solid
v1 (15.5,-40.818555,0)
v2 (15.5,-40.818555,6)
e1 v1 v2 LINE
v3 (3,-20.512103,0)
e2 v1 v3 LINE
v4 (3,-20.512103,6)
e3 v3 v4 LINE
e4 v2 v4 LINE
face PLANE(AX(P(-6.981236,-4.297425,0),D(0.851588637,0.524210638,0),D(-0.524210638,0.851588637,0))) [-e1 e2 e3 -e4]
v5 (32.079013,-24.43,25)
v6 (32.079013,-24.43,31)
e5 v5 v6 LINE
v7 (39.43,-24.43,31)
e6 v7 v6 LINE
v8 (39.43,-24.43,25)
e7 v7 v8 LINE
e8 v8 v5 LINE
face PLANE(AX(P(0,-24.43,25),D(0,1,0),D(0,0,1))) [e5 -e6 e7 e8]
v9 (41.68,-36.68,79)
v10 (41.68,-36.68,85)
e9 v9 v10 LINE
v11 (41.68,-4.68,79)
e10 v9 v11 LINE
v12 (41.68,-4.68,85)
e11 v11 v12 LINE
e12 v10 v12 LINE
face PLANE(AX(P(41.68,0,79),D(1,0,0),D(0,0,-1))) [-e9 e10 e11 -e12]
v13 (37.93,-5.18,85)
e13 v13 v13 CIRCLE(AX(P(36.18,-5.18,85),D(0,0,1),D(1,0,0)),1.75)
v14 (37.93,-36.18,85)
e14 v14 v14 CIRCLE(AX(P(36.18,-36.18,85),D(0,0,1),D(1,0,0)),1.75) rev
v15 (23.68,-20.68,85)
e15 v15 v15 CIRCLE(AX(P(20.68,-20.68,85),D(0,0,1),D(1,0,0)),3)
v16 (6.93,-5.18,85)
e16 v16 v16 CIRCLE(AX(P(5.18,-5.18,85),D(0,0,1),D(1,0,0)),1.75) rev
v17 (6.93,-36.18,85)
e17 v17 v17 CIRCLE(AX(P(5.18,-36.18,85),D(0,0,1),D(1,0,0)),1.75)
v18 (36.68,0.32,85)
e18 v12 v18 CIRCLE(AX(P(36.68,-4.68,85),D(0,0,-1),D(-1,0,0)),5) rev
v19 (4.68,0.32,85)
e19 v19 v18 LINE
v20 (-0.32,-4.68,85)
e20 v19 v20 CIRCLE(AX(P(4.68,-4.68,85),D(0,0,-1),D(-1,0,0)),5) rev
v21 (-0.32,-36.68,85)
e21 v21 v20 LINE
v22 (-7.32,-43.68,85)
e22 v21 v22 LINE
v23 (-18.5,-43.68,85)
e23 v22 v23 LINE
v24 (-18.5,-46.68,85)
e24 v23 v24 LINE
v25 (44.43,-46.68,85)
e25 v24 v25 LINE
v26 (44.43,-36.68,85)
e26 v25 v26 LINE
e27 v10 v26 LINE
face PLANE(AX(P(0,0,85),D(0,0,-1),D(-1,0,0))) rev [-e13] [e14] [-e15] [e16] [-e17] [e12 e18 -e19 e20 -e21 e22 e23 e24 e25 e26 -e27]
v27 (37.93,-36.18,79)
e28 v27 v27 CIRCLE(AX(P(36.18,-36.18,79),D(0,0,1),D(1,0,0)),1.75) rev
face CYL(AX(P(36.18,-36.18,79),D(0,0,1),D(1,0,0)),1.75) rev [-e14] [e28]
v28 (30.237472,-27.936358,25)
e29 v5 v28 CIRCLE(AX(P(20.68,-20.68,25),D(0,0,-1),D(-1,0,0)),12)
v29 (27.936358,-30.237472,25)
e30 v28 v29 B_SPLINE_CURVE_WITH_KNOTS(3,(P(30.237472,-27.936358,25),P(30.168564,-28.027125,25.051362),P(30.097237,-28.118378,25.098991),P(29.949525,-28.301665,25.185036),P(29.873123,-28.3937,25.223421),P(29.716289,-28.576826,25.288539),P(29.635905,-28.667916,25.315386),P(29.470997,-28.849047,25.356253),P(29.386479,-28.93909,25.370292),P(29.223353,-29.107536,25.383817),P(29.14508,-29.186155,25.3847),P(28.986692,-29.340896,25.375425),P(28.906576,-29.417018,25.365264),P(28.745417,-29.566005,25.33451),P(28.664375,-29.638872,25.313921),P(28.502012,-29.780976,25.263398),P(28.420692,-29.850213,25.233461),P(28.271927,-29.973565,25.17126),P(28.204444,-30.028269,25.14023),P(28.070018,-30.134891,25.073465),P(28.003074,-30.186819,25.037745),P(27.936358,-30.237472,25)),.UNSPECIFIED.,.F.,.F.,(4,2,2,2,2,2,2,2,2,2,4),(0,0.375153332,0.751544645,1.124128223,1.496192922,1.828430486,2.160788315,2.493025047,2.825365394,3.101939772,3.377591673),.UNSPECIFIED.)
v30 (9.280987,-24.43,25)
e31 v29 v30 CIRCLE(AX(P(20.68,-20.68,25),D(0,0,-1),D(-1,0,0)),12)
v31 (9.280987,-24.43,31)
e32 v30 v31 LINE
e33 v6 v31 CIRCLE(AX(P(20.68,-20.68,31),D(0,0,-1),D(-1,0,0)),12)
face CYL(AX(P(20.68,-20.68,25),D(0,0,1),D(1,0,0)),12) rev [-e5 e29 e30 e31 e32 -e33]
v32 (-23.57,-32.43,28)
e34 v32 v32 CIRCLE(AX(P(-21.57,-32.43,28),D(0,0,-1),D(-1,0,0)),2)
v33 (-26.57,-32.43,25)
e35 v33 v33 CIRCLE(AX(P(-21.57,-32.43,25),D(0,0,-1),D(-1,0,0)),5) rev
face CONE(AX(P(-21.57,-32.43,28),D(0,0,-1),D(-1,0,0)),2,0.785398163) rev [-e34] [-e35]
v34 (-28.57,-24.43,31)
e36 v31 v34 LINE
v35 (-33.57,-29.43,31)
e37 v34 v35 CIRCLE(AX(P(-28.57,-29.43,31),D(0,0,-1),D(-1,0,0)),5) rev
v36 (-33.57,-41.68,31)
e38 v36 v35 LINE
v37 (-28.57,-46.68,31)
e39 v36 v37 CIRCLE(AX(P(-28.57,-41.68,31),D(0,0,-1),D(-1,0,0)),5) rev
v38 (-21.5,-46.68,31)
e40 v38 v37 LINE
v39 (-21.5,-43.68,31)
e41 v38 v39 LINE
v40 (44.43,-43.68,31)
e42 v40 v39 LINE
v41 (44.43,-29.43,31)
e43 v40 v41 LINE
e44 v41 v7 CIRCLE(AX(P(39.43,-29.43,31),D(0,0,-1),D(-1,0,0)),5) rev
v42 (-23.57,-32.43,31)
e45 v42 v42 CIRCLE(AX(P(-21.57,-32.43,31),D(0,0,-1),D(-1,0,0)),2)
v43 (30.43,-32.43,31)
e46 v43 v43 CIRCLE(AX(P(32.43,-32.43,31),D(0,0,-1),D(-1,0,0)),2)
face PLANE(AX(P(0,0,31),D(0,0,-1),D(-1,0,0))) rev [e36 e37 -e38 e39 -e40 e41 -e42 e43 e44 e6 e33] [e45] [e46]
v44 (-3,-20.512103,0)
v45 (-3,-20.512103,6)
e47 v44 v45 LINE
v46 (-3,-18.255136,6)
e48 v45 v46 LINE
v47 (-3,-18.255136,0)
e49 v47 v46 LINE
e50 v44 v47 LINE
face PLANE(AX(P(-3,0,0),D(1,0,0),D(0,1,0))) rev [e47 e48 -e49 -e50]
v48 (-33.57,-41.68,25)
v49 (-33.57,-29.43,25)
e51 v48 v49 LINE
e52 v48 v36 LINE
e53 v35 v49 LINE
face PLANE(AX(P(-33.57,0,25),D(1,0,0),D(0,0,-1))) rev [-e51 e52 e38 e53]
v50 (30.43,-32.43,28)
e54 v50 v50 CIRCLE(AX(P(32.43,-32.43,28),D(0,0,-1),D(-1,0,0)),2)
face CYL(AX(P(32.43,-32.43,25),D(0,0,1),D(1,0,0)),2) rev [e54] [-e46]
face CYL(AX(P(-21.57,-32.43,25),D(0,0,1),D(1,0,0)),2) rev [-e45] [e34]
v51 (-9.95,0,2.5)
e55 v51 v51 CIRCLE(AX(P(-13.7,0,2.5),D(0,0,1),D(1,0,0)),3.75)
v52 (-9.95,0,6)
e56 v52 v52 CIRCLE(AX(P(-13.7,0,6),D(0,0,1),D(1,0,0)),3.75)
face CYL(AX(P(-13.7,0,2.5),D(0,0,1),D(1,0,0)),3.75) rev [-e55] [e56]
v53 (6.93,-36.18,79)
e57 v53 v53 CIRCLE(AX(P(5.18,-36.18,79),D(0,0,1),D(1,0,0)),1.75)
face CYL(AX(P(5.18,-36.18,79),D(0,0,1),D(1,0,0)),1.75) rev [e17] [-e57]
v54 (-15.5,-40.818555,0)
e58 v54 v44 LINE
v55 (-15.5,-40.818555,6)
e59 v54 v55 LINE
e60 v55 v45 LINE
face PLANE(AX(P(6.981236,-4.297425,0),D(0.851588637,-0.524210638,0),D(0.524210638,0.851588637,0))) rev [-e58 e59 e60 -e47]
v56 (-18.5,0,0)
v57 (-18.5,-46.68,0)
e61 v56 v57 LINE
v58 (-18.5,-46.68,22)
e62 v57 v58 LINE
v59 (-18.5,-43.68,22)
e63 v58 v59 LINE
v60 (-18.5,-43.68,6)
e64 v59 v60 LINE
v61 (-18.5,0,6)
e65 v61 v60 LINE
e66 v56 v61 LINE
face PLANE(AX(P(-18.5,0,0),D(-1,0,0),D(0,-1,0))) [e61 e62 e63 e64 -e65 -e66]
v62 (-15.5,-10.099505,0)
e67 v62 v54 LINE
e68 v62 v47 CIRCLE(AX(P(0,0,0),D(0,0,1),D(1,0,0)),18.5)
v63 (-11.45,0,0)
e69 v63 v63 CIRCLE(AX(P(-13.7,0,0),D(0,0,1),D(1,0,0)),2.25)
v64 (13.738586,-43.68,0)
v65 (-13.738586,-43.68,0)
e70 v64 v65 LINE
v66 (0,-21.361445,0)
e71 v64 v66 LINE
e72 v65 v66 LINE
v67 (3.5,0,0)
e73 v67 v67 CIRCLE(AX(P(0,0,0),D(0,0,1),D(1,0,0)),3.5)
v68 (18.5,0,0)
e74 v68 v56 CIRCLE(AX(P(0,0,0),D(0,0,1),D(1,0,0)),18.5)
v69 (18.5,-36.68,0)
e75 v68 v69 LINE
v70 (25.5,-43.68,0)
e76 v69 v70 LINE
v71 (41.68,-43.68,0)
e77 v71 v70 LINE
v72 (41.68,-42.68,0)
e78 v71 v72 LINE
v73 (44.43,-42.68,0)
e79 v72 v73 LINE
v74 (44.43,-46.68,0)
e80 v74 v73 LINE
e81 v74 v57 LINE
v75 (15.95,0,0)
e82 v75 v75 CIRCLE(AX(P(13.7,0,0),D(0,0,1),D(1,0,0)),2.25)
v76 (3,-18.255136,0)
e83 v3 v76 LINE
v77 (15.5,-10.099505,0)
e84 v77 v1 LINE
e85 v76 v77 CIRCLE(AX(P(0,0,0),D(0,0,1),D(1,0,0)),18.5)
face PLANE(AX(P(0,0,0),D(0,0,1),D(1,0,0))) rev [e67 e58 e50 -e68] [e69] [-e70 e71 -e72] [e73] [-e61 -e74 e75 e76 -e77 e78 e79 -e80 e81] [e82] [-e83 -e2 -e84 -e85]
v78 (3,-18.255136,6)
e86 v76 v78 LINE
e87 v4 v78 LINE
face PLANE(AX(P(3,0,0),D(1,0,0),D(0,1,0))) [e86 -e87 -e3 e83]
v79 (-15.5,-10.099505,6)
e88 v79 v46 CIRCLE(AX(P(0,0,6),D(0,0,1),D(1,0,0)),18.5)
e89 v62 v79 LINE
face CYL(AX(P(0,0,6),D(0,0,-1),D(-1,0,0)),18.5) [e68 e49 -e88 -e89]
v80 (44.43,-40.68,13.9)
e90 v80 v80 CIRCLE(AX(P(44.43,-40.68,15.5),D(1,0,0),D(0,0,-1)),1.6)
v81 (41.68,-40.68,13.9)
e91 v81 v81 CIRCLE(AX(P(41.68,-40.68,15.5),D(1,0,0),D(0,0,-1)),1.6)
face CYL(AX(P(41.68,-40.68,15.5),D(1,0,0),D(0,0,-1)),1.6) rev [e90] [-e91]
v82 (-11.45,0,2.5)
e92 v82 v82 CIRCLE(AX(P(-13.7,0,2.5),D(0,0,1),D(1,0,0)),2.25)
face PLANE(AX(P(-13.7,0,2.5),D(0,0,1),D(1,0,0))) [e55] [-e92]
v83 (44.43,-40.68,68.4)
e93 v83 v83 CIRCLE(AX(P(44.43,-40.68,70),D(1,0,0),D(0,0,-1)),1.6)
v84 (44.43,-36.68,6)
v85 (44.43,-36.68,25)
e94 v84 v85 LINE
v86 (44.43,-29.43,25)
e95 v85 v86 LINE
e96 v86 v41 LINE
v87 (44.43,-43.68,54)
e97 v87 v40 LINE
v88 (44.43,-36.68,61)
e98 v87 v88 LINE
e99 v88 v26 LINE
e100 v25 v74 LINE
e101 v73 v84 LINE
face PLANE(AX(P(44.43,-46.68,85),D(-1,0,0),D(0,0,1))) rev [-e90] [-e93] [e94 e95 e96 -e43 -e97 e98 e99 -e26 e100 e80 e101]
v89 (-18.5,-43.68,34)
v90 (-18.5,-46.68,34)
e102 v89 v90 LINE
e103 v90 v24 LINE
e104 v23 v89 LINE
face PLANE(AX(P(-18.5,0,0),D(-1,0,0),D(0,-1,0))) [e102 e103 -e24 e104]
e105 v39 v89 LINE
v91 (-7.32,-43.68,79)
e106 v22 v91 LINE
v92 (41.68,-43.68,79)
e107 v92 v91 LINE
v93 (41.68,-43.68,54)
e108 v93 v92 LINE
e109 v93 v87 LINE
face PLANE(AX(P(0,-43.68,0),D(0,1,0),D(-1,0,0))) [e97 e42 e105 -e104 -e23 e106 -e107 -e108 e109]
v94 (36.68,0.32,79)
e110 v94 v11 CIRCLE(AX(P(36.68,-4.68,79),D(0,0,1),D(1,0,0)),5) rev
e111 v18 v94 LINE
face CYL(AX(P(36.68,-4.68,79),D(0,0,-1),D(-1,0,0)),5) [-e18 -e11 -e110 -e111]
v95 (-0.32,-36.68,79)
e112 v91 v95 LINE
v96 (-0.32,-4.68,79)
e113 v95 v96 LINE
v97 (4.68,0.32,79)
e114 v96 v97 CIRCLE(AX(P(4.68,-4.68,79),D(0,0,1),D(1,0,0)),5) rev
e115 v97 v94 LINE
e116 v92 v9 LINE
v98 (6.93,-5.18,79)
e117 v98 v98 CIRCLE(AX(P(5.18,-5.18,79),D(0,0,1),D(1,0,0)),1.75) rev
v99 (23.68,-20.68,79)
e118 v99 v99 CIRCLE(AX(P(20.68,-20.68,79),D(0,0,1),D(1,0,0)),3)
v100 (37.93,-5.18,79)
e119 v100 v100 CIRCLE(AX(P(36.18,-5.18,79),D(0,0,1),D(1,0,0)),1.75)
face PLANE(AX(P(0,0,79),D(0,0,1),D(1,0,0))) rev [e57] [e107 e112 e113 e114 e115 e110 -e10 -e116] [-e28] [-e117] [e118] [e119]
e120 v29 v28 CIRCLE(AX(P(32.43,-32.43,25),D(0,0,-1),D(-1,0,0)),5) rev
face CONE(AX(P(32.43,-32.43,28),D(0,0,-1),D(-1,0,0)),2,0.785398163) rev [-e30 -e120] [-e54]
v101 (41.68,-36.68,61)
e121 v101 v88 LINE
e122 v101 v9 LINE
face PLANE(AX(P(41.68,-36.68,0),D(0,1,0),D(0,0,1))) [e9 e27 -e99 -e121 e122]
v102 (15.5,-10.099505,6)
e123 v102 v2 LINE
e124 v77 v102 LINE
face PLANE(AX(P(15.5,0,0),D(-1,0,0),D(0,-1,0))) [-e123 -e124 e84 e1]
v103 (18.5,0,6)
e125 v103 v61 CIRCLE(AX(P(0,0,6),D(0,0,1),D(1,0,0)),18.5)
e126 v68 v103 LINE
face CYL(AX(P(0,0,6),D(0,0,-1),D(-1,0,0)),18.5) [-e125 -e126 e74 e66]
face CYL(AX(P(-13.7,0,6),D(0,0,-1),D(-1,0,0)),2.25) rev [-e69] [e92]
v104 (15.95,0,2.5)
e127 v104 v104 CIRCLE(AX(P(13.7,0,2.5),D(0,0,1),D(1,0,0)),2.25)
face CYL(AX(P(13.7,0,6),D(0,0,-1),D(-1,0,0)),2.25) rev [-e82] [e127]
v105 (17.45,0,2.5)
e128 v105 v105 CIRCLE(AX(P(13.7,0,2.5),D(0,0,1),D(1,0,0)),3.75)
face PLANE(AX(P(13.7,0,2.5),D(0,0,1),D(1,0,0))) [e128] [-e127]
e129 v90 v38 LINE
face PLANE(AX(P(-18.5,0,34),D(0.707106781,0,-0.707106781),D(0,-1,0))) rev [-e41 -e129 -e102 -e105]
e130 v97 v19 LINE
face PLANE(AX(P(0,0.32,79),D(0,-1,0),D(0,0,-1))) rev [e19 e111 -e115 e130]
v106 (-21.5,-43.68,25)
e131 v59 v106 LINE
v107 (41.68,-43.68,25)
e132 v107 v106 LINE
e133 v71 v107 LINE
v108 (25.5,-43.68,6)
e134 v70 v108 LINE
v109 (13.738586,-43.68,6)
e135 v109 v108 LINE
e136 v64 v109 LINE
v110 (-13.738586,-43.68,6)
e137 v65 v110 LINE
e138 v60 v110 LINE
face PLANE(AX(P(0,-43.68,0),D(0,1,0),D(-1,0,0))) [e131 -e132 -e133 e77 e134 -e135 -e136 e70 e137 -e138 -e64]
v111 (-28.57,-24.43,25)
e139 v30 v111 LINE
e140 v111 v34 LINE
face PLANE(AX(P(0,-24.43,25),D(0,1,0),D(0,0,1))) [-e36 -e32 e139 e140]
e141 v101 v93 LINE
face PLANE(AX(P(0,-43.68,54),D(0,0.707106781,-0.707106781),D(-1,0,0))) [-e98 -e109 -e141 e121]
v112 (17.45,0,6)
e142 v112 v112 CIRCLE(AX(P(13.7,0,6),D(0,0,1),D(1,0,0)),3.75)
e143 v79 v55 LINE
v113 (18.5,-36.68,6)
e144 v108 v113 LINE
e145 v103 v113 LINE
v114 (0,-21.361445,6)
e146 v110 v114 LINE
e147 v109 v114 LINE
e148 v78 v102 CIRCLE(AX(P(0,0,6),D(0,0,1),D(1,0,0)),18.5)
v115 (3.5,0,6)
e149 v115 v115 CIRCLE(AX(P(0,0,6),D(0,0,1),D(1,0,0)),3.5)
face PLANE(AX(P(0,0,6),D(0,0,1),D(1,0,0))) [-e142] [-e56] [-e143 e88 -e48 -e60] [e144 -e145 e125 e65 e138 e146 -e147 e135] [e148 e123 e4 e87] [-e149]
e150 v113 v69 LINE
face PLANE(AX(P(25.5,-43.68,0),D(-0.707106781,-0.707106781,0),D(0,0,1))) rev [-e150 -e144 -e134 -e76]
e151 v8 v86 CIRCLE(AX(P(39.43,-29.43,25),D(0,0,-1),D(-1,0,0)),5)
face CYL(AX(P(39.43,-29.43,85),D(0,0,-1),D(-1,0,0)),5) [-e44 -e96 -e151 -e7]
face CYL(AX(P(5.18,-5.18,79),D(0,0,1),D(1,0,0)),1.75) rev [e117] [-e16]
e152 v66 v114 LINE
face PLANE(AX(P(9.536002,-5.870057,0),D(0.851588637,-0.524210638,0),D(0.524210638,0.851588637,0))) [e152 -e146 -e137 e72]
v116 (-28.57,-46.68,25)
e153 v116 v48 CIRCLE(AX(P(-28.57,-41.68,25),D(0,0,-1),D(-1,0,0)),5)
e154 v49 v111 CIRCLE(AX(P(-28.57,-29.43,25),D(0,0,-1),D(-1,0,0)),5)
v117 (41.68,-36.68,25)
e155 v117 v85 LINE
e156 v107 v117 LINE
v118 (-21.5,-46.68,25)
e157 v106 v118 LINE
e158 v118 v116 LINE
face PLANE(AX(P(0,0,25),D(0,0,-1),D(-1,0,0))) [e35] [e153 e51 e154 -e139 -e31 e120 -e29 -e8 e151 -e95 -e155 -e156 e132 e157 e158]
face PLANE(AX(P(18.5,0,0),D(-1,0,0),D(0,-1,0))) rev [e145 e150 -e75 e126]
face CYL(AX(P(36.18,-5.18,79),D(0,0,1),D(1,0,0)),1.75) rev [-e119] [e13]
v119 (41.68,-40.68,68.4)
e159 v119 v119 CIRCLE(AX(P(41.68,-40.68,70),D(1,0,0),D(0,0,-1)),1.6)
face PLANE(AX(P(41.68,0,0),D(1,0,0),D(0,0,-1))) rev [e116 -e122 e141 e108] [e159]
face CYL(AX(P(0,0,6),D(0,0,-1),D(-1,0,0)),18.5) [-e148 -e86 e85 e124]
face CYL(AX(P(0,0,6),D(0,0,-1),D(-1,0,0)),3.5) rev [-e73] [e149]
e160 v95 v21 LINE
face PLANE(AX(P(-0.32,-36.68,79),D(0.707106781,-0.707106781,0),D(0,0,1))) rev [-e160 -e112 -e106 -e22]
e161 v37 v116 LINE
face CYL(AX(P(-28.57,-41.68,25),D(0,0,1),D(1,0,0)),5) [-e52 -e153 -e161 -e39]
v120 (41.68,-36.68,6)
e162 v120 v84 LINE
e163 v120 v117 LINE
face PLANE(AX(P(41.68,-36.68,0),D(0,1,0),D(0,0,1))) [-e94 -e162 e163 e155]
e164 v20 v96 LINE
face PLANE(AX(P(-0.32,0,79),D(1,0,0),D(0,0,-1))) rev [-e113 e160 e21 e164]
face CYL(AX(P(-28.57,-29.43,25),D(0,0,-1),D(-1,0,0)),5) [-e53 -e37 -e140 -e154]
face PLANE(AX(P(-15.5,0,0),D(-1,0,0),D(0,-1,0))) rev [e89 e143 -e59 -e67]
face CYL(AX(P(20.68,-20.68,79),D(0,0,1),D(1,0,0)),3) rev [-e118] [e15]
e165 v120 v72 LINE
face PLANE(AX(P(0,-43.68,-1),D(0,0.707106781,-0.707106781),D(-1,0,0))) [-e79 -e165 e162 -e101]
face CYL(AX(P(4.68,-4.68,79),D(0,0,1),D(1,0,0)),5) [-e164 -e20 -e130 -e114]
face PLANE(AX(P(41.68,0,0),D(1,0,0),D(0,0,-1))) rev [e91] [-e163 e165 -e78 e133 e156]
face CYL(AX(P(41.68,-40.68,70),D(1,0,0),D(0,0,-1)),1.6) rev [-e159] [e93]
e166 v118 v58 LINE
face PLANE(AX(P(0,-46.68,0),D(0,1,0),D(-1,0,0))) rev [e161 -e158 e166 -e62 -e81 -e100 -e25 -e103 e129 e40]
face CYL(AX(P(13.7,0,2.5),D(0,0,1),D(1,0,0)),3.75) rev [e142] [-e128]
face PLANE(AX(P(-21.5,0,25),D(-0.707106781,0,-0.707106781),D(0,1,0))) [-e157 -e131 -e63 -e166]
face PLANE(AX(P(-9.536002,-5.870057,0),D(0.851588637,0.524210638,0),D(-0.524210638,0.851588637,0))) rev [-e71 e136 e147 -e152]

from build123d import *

# Parameters (mm, degrees)
SKETCH1_R           = 18.5
SKETCH1_R_2         = 3.5
SKETCH1_R_3         = 2.25
BOSS_EXTRUDE1_DEPTH = 6
SKETCH2_R           = 3.75
CUT_EXTRUDE1_DEPTH  = 3.5
BOSS_EXTRUDE2_START = -6
BOSS_EXTRUDE2_DEPTH = 6
SKETCH4_W           = 62.93
SKETCH4_H           = 3
BOSS_EXTRUDE3_DEPTH = 85
SKETCH6_R           = 2
BOSS_EXTRUDE5_DEPTH = 6
SKETCH5_W           = 42
SKETCH5_H           = 44
SKETCH5_R           = 1.75
SKETCH5_R_2         = 3
BOSS_EXTRUDE4_DEPTH = 6
SKETCH7_W           = 15.07
SKETCH7_H           = 6
BOSS_EXTRUDE6_DEPTH = 3
CHAMFER1_SIZE       = 3
SKETCH8_W           = 6
SKETCH8_H           = 7
SKETCH8_W_2         = 18
SKETCH8_R           = 1.6
SKETCH8_W_3         = 19
BOSS_EXTRUDE7_DEPTH = 2.75
CHAMFER2_SIZE       = 7
FILLET1_R           = 5
CHAMFER3_SIZE       = 3


with BuildPart() as part:
    # Sketch1 → Boss-Extrude1 (new body)
    with BuildSketch(Plane.XY):
        Circle(SKETCH1_R)
        Circle(SKETCH1_R_2, mode=Mode.SUBTRACT)
        with Locations((-13.7, 0)):
            Circle(SKETCH1_R_3, mode=Mode.SUBTRACT)
        with Locations((13.7, 0)):
            Circle(SKETCH1_R_3, mode=Mode.SUBTRACT)
    extrude(amount=BOSS_EXTRUDE1_DEPTH)

    # Sketch2 → Cut-Extrude1 (cut)
    with BuildSketch(Plane.XY.offset(6)):
        with Locations((-13.7, 0)):
            Circle(SKETCH2_R)
        with Locations((13.7, 0)):
            Circle(SKETCH2_R)
    extrude(amount=-CUT_EXTRUDE1_DEPTH, mode=Mode.SUBTRACT)

    # Sketch3 → Boss-Extrude2 (add)
    with BuildSketch(Plane.XY.offset(6).offset(BOSS_EXTRUDE2_START)):
        with BuildLine():
            ThreePointArc((-15.5, -10.099504938), (-17.734147851, -5.267826876), (-18.5, 0))
            Line((-18.5, 0), (-18.5, -46.68))
            Line((-18.5, -46.68), (18.5, -46.68))
            Line((18.5, -46.68), (18.5, 0))
            ThreePointArc((18.5, 0), (17.734147851, -5.267826876), (15.5, -10.099504938))
            Line((15.5, -10.099504938), (15.5, -40.818554828))
            Line((15.5, -40.818554828), (15.5, -43.68))
            Line((15.5, -43.68), (13.738586173, -43.68))
            Line((13.738586173, -43.68), (-13.738586173, -43.68))
            Line((-13.738586173, -43.68), (-15.5, -43.68))
            Line((-15.5, -43.68), (-15.5, -40.818554828))
            Line((-15.5, -40.818554828), (-15.5, -10.099504938))
        make_face()
        with BuildLine():
            Line((-3, -20.512103215), (-15.5, -40.818554828))
            Line((-15.5, -40.818554828), (-15.5, -43.68))
            Line((-15.5, -43.68), (-13.738586173, -43.68))
            Line((-13.738586173, -43.68), (0, -21.361445172))
            Line((0, -21.361445172), (13.738586173, -43.68))
            Line((13.738586173, -43.68), (15.5, -43.68))
            Line((15.5, -43.68), (15.5, -40.818554828))
            Line((15.5, -40.818554828), (3, -20.512103215))
            Line((3, -20.512103215), (1.71251735, -18.420566884))
            ThreePointArc((1.71251735, -18.420566884), (0, -18.5), (-1.71251735, -18.420566884))
            Line((-1.71251735, -18.420566884), (-3, -20.512103215))
        make_face()
        with BuildLine():
            Line((3, -20.512103215), (3, -18.255136264))
            ThreePointArc((3, -18.255136264), (2.357710068, -18.349147207), (1.71251735, -18.420566884))
            Line((1.71251735, -18.420566884), (3, -20.512103215))
        make_face()
        with BuildLine():
            ThreePointArc((-1.71251735, -18.420566884), (-2.357710068, -18.349147207), (-3, -18.255136264))
            Line((-3, -18.255136264), (-3, -20.512103215))
            Line((-3, -20.512103215), (-1.71251735, -18.420566884))
        make_face()
    extrude(amount=BOSS_EXTRUDE2_DEPTH)

    # Sketch4 → Boss-Extrude3 (add)
    with BuildSketch(Plane.XY):
        with Locations((12.965, -45.18)):
            Rectangle(SKETCH4_W, SKETCH4_H)
    extrude(amount=BOSS_EXTRUDE3_DEPTH)

    # Sketch6 → Boss-Extrude5 (add)
    with BuildSketch(Plane(origin=(0, 0, 31), x_dir=(-1, 0, 0), z_dir=(0, 0, -1))):
        with BuildLine():
            Line((-44.43, -24.43), (-44.43, -43.68))
            Line((-44.43, -43.68), (33.57, -43.68))
            Line((33.57, -43.68), (33.57, -24.43))
            Line((33.57, -24.43), (-9.280986885, -24.43))
            ThreePointArc((-9.280986885, -24.43), (-20.68, -32.68), (-32.079013115, -24.43))
            Line((-32.079013115, -24.43), (-44.43, -24.43))
        make_face()
        with Locations((-32.43, -32.43)):
            Circle(SKETCH6_R, mode=Mode.SUBTRACT)
        with Locations((21.57, -32.43)):
            Circle(SKETCH6_R, mode=Mode.SUBTRACT)
    extrude(amount=BOSS_EXTRUDE5_DEPTH)

    # Sketch5 → Boss-Extrude4 (add)
    with BuildSketch(Plane.XY.offset(85)):
        with Locations((20.68, -21.68)):
            Rectangle(SKETCH5_W, SKETCH5_H)
        with Locations((5.18, -36.18)):
            Circle(SKETCH5_R, mode=Mode.SUBTRACT)
        with Locations((36.18, -36.18)):
            Circle(SKETCH5_R, mode=Mode.SUBTRACT)
        with Locations((5.18, -5.18)):
            Circle(SKETCH5_R, mode=Mode.SUBTRACT)
        with Locations((20.68, -20.68)):
            Circle(SKETCH5_R_2, mode=Mode.SUBTRACT)
        with Locations((36.18, -5.18)):
            Circle(SKETCH5_R, mode=Mode.SUBTRACT)
    extrude(amount=-BOSS_EXTRUDE4_DEPTH)

    # Sketch7 → Boss-Extrude6 (add)
    with BuildSketch(Plane.XZ.offset(46.68)):
        with Locations((-26.035, 28)):
            Rectangle(SKETCH7_W, SKETCH7_H)
    extrude(amount=-BOSS_EXTRUDE6_DEPTH)

    # Chamfer1
    chamfer1_edges = [part.edges().sort_by_distance(p)[0] for p in [
        (-18.5, -45.18, 31),
        (-18.5, -45.18, 25),
    ]]
    chamfer(chamfer1_edges, length=CHAMFER1_SIZE)

    # Sketch8 → Boss-Extrude7 (add)
    # profile 1 of 3: a face of its own
    with BuildSketch(Plane(origin=(44.43, 0, 0), x_dir=(0, 0, -1), z_dir=(1, 0, 0))):
        with Locations((-82, -40.18)):
            Rectangle(SKETCH8_W, SKETCH8_H)
    # profile 2 of 3: a face of its own
    with BuildSketch(Plane(origin=(44.43, 0, 0), x_dir=(0, 0, -1), z_dir=(1, 0, 0))):
        with Locations((-70, -40.18)):
            Rectangle(SKETCH8_W_2, SKETCH8_H)
        with Locations((-70, -40.68)):
            Circle(SKETCH8_R, mode=Mode.SUBTRACT)
    # profile 3 of 3: a face of its own
    with BuildSketch(Plane(origin=(44.43, 0, 0), x_dir=(0, 0, -1), z_dir=(1, 0, 0))):
        with Locations((-15.5, -40.18)):
            Rectangle(SKETCH8_W_3, SKETCH8_H)
        with Locations((-15.5, -40.68)):
            Circle(SKETCH8_R, mode=Mode.SUBTRACT)
    extrude(amount=-BOSS_EXTRUDE7_DEPTH)

    # Chamfer2
    # the kernel refuses this chamfer: 7 mm, written as the material it adds along each edge
    with BuildSketch(Plane(origin=(-0.32, -43.68, 85), x_dir=(-0.9996219169112968, -0.02749587661058612, 0), z_dir=(0, 0, -1)), Plane(origin=(18.5, -43.68, 0), x_dir=(0.9996219169112968, -0.027495876610586112, 0), z_dir=(0, 0, 1))) as chamfer2_piece_1:
        Polygon((CHAMFER2_SIZE * 0.999621916911, CHAMFER2_SIZE * 0.0274958766106), (-CHAMFER2_SIZE * 0.0274958766106, CHAMFER2_SIZE * 0.999621916911), (0, 0), align=None)
    extrude(amount=6)
    with BuildSketch(Plane(origin=(44.43, -43.68, 6), x_dir=(0, -0.02749587661058612, -0.9996219169112968), z_dir=(-1, 0, 0))) as chamfer2_piece_2_section:
        Polygon((CHAMFER2_SIZE * 0.999621916911, -CHAMFER2_SIZE * 0.0274958766106), (-CHAMFER2_SIZE * 0.0274958766106, -CHAMFER2_SIZE * 0.999621916911), (0, 0), align=None)
    chamfer2_piece_2 = extrude(amount=2.75, mode=Mode.PRIVATE)
    chamfer2_piece_2 = split(chamfer2_piece_2, bisect_by=Plane(origin=(43.055, -41.310788547, 0), z_dir=(0, 0, 1)), keep=Keep.TOP, mode=Mode.PRIVATE)
    chamfer2_piece_2 = split(chamfer2_piece_2, bisect_by=Plane(origin=(43.055, -36.68, 3.818532593), z_dir=(0, -1, 0)), keep=Keep.TOP, mode=Mode.PRIVATE)
    add(chamfer2_piece_2)
    with BuildSketch(Plane(origin=(44.43, -43.68, 61), x_dir=(0, -0.027495876610586126, -0.9996219169112968), z_dir=(-1, 0, 0))) as chamfer2_piece_3_section:
        Polygon((CHAMFER2_SIZE * 0.999621916911, -CHAMFER2_SIZE * 0.0274958766106), (-CHAMFER2_SIZE * 0.0274958766106, -CHAMFER2_SIZE * 0.999621916911), (0, 0), align=None)
    chamfer2_piece_3 = extrude(amount=2.75, mode=Mode.PRIVATE)
    chamfer2_piece_3 = split(chamfer2_piece_3, bisect_by=Plane(origin=(43.055, -36.68, 58.68717092), z_dir=(0, -1, 0)), keep=Keep.TOP, mode=Mode.PRIVATE)
    add(chamfer2_piece_3)

    # Fillet1
    fillet1_edges = [part.edges().sort_by_distance(p)[0] for p in [
        (44.43, -24.43, 28),
        (-33.57, -24.43, 28),
        (-0.32, 0.32, 82),
        (41.68, 0.32, 82),
        (-33.57, -46.68, 28),
    ]]
    fillet(fillet1_edges, radius=FILLET1_R)

    # Chamfer3
    # the kernel refuses this chamfer: 3 mm, written as the material it takes off along each edge
    with BuildSketch(Plane(origin=(-21.57, -32.43, 25), x_dir=(-1, 0, 0), z_dir=(0, -1, 0))) as chamfer3_piece_1:
        Polygon((2, -CHAMFER3_SIZE), (2 + CHAMFER3_SIZE, 0), (2, 0), align=None)
    revolve(axis=Axis((-21.57, -32.43, 25), (0, 0, -1)), mode=Mode.SUBTRACT)
    with BuildSketch(Plane(origin=(32.43, -32.43, 25), x_dir=(-1, 0, 0), z_dir=(0, -1, 0))) as chamfer3_piece_2:
        Polygon((2, -CHAMFER3_SIZE), (2 + CHAMFER3_SIZE, 0), (2, 0), align=None)
    revolve(axis=Axis((32.43, -32.43, 25), (0, 0, -1)), mode=Mode.SUBTRACT)


solid = part.part
